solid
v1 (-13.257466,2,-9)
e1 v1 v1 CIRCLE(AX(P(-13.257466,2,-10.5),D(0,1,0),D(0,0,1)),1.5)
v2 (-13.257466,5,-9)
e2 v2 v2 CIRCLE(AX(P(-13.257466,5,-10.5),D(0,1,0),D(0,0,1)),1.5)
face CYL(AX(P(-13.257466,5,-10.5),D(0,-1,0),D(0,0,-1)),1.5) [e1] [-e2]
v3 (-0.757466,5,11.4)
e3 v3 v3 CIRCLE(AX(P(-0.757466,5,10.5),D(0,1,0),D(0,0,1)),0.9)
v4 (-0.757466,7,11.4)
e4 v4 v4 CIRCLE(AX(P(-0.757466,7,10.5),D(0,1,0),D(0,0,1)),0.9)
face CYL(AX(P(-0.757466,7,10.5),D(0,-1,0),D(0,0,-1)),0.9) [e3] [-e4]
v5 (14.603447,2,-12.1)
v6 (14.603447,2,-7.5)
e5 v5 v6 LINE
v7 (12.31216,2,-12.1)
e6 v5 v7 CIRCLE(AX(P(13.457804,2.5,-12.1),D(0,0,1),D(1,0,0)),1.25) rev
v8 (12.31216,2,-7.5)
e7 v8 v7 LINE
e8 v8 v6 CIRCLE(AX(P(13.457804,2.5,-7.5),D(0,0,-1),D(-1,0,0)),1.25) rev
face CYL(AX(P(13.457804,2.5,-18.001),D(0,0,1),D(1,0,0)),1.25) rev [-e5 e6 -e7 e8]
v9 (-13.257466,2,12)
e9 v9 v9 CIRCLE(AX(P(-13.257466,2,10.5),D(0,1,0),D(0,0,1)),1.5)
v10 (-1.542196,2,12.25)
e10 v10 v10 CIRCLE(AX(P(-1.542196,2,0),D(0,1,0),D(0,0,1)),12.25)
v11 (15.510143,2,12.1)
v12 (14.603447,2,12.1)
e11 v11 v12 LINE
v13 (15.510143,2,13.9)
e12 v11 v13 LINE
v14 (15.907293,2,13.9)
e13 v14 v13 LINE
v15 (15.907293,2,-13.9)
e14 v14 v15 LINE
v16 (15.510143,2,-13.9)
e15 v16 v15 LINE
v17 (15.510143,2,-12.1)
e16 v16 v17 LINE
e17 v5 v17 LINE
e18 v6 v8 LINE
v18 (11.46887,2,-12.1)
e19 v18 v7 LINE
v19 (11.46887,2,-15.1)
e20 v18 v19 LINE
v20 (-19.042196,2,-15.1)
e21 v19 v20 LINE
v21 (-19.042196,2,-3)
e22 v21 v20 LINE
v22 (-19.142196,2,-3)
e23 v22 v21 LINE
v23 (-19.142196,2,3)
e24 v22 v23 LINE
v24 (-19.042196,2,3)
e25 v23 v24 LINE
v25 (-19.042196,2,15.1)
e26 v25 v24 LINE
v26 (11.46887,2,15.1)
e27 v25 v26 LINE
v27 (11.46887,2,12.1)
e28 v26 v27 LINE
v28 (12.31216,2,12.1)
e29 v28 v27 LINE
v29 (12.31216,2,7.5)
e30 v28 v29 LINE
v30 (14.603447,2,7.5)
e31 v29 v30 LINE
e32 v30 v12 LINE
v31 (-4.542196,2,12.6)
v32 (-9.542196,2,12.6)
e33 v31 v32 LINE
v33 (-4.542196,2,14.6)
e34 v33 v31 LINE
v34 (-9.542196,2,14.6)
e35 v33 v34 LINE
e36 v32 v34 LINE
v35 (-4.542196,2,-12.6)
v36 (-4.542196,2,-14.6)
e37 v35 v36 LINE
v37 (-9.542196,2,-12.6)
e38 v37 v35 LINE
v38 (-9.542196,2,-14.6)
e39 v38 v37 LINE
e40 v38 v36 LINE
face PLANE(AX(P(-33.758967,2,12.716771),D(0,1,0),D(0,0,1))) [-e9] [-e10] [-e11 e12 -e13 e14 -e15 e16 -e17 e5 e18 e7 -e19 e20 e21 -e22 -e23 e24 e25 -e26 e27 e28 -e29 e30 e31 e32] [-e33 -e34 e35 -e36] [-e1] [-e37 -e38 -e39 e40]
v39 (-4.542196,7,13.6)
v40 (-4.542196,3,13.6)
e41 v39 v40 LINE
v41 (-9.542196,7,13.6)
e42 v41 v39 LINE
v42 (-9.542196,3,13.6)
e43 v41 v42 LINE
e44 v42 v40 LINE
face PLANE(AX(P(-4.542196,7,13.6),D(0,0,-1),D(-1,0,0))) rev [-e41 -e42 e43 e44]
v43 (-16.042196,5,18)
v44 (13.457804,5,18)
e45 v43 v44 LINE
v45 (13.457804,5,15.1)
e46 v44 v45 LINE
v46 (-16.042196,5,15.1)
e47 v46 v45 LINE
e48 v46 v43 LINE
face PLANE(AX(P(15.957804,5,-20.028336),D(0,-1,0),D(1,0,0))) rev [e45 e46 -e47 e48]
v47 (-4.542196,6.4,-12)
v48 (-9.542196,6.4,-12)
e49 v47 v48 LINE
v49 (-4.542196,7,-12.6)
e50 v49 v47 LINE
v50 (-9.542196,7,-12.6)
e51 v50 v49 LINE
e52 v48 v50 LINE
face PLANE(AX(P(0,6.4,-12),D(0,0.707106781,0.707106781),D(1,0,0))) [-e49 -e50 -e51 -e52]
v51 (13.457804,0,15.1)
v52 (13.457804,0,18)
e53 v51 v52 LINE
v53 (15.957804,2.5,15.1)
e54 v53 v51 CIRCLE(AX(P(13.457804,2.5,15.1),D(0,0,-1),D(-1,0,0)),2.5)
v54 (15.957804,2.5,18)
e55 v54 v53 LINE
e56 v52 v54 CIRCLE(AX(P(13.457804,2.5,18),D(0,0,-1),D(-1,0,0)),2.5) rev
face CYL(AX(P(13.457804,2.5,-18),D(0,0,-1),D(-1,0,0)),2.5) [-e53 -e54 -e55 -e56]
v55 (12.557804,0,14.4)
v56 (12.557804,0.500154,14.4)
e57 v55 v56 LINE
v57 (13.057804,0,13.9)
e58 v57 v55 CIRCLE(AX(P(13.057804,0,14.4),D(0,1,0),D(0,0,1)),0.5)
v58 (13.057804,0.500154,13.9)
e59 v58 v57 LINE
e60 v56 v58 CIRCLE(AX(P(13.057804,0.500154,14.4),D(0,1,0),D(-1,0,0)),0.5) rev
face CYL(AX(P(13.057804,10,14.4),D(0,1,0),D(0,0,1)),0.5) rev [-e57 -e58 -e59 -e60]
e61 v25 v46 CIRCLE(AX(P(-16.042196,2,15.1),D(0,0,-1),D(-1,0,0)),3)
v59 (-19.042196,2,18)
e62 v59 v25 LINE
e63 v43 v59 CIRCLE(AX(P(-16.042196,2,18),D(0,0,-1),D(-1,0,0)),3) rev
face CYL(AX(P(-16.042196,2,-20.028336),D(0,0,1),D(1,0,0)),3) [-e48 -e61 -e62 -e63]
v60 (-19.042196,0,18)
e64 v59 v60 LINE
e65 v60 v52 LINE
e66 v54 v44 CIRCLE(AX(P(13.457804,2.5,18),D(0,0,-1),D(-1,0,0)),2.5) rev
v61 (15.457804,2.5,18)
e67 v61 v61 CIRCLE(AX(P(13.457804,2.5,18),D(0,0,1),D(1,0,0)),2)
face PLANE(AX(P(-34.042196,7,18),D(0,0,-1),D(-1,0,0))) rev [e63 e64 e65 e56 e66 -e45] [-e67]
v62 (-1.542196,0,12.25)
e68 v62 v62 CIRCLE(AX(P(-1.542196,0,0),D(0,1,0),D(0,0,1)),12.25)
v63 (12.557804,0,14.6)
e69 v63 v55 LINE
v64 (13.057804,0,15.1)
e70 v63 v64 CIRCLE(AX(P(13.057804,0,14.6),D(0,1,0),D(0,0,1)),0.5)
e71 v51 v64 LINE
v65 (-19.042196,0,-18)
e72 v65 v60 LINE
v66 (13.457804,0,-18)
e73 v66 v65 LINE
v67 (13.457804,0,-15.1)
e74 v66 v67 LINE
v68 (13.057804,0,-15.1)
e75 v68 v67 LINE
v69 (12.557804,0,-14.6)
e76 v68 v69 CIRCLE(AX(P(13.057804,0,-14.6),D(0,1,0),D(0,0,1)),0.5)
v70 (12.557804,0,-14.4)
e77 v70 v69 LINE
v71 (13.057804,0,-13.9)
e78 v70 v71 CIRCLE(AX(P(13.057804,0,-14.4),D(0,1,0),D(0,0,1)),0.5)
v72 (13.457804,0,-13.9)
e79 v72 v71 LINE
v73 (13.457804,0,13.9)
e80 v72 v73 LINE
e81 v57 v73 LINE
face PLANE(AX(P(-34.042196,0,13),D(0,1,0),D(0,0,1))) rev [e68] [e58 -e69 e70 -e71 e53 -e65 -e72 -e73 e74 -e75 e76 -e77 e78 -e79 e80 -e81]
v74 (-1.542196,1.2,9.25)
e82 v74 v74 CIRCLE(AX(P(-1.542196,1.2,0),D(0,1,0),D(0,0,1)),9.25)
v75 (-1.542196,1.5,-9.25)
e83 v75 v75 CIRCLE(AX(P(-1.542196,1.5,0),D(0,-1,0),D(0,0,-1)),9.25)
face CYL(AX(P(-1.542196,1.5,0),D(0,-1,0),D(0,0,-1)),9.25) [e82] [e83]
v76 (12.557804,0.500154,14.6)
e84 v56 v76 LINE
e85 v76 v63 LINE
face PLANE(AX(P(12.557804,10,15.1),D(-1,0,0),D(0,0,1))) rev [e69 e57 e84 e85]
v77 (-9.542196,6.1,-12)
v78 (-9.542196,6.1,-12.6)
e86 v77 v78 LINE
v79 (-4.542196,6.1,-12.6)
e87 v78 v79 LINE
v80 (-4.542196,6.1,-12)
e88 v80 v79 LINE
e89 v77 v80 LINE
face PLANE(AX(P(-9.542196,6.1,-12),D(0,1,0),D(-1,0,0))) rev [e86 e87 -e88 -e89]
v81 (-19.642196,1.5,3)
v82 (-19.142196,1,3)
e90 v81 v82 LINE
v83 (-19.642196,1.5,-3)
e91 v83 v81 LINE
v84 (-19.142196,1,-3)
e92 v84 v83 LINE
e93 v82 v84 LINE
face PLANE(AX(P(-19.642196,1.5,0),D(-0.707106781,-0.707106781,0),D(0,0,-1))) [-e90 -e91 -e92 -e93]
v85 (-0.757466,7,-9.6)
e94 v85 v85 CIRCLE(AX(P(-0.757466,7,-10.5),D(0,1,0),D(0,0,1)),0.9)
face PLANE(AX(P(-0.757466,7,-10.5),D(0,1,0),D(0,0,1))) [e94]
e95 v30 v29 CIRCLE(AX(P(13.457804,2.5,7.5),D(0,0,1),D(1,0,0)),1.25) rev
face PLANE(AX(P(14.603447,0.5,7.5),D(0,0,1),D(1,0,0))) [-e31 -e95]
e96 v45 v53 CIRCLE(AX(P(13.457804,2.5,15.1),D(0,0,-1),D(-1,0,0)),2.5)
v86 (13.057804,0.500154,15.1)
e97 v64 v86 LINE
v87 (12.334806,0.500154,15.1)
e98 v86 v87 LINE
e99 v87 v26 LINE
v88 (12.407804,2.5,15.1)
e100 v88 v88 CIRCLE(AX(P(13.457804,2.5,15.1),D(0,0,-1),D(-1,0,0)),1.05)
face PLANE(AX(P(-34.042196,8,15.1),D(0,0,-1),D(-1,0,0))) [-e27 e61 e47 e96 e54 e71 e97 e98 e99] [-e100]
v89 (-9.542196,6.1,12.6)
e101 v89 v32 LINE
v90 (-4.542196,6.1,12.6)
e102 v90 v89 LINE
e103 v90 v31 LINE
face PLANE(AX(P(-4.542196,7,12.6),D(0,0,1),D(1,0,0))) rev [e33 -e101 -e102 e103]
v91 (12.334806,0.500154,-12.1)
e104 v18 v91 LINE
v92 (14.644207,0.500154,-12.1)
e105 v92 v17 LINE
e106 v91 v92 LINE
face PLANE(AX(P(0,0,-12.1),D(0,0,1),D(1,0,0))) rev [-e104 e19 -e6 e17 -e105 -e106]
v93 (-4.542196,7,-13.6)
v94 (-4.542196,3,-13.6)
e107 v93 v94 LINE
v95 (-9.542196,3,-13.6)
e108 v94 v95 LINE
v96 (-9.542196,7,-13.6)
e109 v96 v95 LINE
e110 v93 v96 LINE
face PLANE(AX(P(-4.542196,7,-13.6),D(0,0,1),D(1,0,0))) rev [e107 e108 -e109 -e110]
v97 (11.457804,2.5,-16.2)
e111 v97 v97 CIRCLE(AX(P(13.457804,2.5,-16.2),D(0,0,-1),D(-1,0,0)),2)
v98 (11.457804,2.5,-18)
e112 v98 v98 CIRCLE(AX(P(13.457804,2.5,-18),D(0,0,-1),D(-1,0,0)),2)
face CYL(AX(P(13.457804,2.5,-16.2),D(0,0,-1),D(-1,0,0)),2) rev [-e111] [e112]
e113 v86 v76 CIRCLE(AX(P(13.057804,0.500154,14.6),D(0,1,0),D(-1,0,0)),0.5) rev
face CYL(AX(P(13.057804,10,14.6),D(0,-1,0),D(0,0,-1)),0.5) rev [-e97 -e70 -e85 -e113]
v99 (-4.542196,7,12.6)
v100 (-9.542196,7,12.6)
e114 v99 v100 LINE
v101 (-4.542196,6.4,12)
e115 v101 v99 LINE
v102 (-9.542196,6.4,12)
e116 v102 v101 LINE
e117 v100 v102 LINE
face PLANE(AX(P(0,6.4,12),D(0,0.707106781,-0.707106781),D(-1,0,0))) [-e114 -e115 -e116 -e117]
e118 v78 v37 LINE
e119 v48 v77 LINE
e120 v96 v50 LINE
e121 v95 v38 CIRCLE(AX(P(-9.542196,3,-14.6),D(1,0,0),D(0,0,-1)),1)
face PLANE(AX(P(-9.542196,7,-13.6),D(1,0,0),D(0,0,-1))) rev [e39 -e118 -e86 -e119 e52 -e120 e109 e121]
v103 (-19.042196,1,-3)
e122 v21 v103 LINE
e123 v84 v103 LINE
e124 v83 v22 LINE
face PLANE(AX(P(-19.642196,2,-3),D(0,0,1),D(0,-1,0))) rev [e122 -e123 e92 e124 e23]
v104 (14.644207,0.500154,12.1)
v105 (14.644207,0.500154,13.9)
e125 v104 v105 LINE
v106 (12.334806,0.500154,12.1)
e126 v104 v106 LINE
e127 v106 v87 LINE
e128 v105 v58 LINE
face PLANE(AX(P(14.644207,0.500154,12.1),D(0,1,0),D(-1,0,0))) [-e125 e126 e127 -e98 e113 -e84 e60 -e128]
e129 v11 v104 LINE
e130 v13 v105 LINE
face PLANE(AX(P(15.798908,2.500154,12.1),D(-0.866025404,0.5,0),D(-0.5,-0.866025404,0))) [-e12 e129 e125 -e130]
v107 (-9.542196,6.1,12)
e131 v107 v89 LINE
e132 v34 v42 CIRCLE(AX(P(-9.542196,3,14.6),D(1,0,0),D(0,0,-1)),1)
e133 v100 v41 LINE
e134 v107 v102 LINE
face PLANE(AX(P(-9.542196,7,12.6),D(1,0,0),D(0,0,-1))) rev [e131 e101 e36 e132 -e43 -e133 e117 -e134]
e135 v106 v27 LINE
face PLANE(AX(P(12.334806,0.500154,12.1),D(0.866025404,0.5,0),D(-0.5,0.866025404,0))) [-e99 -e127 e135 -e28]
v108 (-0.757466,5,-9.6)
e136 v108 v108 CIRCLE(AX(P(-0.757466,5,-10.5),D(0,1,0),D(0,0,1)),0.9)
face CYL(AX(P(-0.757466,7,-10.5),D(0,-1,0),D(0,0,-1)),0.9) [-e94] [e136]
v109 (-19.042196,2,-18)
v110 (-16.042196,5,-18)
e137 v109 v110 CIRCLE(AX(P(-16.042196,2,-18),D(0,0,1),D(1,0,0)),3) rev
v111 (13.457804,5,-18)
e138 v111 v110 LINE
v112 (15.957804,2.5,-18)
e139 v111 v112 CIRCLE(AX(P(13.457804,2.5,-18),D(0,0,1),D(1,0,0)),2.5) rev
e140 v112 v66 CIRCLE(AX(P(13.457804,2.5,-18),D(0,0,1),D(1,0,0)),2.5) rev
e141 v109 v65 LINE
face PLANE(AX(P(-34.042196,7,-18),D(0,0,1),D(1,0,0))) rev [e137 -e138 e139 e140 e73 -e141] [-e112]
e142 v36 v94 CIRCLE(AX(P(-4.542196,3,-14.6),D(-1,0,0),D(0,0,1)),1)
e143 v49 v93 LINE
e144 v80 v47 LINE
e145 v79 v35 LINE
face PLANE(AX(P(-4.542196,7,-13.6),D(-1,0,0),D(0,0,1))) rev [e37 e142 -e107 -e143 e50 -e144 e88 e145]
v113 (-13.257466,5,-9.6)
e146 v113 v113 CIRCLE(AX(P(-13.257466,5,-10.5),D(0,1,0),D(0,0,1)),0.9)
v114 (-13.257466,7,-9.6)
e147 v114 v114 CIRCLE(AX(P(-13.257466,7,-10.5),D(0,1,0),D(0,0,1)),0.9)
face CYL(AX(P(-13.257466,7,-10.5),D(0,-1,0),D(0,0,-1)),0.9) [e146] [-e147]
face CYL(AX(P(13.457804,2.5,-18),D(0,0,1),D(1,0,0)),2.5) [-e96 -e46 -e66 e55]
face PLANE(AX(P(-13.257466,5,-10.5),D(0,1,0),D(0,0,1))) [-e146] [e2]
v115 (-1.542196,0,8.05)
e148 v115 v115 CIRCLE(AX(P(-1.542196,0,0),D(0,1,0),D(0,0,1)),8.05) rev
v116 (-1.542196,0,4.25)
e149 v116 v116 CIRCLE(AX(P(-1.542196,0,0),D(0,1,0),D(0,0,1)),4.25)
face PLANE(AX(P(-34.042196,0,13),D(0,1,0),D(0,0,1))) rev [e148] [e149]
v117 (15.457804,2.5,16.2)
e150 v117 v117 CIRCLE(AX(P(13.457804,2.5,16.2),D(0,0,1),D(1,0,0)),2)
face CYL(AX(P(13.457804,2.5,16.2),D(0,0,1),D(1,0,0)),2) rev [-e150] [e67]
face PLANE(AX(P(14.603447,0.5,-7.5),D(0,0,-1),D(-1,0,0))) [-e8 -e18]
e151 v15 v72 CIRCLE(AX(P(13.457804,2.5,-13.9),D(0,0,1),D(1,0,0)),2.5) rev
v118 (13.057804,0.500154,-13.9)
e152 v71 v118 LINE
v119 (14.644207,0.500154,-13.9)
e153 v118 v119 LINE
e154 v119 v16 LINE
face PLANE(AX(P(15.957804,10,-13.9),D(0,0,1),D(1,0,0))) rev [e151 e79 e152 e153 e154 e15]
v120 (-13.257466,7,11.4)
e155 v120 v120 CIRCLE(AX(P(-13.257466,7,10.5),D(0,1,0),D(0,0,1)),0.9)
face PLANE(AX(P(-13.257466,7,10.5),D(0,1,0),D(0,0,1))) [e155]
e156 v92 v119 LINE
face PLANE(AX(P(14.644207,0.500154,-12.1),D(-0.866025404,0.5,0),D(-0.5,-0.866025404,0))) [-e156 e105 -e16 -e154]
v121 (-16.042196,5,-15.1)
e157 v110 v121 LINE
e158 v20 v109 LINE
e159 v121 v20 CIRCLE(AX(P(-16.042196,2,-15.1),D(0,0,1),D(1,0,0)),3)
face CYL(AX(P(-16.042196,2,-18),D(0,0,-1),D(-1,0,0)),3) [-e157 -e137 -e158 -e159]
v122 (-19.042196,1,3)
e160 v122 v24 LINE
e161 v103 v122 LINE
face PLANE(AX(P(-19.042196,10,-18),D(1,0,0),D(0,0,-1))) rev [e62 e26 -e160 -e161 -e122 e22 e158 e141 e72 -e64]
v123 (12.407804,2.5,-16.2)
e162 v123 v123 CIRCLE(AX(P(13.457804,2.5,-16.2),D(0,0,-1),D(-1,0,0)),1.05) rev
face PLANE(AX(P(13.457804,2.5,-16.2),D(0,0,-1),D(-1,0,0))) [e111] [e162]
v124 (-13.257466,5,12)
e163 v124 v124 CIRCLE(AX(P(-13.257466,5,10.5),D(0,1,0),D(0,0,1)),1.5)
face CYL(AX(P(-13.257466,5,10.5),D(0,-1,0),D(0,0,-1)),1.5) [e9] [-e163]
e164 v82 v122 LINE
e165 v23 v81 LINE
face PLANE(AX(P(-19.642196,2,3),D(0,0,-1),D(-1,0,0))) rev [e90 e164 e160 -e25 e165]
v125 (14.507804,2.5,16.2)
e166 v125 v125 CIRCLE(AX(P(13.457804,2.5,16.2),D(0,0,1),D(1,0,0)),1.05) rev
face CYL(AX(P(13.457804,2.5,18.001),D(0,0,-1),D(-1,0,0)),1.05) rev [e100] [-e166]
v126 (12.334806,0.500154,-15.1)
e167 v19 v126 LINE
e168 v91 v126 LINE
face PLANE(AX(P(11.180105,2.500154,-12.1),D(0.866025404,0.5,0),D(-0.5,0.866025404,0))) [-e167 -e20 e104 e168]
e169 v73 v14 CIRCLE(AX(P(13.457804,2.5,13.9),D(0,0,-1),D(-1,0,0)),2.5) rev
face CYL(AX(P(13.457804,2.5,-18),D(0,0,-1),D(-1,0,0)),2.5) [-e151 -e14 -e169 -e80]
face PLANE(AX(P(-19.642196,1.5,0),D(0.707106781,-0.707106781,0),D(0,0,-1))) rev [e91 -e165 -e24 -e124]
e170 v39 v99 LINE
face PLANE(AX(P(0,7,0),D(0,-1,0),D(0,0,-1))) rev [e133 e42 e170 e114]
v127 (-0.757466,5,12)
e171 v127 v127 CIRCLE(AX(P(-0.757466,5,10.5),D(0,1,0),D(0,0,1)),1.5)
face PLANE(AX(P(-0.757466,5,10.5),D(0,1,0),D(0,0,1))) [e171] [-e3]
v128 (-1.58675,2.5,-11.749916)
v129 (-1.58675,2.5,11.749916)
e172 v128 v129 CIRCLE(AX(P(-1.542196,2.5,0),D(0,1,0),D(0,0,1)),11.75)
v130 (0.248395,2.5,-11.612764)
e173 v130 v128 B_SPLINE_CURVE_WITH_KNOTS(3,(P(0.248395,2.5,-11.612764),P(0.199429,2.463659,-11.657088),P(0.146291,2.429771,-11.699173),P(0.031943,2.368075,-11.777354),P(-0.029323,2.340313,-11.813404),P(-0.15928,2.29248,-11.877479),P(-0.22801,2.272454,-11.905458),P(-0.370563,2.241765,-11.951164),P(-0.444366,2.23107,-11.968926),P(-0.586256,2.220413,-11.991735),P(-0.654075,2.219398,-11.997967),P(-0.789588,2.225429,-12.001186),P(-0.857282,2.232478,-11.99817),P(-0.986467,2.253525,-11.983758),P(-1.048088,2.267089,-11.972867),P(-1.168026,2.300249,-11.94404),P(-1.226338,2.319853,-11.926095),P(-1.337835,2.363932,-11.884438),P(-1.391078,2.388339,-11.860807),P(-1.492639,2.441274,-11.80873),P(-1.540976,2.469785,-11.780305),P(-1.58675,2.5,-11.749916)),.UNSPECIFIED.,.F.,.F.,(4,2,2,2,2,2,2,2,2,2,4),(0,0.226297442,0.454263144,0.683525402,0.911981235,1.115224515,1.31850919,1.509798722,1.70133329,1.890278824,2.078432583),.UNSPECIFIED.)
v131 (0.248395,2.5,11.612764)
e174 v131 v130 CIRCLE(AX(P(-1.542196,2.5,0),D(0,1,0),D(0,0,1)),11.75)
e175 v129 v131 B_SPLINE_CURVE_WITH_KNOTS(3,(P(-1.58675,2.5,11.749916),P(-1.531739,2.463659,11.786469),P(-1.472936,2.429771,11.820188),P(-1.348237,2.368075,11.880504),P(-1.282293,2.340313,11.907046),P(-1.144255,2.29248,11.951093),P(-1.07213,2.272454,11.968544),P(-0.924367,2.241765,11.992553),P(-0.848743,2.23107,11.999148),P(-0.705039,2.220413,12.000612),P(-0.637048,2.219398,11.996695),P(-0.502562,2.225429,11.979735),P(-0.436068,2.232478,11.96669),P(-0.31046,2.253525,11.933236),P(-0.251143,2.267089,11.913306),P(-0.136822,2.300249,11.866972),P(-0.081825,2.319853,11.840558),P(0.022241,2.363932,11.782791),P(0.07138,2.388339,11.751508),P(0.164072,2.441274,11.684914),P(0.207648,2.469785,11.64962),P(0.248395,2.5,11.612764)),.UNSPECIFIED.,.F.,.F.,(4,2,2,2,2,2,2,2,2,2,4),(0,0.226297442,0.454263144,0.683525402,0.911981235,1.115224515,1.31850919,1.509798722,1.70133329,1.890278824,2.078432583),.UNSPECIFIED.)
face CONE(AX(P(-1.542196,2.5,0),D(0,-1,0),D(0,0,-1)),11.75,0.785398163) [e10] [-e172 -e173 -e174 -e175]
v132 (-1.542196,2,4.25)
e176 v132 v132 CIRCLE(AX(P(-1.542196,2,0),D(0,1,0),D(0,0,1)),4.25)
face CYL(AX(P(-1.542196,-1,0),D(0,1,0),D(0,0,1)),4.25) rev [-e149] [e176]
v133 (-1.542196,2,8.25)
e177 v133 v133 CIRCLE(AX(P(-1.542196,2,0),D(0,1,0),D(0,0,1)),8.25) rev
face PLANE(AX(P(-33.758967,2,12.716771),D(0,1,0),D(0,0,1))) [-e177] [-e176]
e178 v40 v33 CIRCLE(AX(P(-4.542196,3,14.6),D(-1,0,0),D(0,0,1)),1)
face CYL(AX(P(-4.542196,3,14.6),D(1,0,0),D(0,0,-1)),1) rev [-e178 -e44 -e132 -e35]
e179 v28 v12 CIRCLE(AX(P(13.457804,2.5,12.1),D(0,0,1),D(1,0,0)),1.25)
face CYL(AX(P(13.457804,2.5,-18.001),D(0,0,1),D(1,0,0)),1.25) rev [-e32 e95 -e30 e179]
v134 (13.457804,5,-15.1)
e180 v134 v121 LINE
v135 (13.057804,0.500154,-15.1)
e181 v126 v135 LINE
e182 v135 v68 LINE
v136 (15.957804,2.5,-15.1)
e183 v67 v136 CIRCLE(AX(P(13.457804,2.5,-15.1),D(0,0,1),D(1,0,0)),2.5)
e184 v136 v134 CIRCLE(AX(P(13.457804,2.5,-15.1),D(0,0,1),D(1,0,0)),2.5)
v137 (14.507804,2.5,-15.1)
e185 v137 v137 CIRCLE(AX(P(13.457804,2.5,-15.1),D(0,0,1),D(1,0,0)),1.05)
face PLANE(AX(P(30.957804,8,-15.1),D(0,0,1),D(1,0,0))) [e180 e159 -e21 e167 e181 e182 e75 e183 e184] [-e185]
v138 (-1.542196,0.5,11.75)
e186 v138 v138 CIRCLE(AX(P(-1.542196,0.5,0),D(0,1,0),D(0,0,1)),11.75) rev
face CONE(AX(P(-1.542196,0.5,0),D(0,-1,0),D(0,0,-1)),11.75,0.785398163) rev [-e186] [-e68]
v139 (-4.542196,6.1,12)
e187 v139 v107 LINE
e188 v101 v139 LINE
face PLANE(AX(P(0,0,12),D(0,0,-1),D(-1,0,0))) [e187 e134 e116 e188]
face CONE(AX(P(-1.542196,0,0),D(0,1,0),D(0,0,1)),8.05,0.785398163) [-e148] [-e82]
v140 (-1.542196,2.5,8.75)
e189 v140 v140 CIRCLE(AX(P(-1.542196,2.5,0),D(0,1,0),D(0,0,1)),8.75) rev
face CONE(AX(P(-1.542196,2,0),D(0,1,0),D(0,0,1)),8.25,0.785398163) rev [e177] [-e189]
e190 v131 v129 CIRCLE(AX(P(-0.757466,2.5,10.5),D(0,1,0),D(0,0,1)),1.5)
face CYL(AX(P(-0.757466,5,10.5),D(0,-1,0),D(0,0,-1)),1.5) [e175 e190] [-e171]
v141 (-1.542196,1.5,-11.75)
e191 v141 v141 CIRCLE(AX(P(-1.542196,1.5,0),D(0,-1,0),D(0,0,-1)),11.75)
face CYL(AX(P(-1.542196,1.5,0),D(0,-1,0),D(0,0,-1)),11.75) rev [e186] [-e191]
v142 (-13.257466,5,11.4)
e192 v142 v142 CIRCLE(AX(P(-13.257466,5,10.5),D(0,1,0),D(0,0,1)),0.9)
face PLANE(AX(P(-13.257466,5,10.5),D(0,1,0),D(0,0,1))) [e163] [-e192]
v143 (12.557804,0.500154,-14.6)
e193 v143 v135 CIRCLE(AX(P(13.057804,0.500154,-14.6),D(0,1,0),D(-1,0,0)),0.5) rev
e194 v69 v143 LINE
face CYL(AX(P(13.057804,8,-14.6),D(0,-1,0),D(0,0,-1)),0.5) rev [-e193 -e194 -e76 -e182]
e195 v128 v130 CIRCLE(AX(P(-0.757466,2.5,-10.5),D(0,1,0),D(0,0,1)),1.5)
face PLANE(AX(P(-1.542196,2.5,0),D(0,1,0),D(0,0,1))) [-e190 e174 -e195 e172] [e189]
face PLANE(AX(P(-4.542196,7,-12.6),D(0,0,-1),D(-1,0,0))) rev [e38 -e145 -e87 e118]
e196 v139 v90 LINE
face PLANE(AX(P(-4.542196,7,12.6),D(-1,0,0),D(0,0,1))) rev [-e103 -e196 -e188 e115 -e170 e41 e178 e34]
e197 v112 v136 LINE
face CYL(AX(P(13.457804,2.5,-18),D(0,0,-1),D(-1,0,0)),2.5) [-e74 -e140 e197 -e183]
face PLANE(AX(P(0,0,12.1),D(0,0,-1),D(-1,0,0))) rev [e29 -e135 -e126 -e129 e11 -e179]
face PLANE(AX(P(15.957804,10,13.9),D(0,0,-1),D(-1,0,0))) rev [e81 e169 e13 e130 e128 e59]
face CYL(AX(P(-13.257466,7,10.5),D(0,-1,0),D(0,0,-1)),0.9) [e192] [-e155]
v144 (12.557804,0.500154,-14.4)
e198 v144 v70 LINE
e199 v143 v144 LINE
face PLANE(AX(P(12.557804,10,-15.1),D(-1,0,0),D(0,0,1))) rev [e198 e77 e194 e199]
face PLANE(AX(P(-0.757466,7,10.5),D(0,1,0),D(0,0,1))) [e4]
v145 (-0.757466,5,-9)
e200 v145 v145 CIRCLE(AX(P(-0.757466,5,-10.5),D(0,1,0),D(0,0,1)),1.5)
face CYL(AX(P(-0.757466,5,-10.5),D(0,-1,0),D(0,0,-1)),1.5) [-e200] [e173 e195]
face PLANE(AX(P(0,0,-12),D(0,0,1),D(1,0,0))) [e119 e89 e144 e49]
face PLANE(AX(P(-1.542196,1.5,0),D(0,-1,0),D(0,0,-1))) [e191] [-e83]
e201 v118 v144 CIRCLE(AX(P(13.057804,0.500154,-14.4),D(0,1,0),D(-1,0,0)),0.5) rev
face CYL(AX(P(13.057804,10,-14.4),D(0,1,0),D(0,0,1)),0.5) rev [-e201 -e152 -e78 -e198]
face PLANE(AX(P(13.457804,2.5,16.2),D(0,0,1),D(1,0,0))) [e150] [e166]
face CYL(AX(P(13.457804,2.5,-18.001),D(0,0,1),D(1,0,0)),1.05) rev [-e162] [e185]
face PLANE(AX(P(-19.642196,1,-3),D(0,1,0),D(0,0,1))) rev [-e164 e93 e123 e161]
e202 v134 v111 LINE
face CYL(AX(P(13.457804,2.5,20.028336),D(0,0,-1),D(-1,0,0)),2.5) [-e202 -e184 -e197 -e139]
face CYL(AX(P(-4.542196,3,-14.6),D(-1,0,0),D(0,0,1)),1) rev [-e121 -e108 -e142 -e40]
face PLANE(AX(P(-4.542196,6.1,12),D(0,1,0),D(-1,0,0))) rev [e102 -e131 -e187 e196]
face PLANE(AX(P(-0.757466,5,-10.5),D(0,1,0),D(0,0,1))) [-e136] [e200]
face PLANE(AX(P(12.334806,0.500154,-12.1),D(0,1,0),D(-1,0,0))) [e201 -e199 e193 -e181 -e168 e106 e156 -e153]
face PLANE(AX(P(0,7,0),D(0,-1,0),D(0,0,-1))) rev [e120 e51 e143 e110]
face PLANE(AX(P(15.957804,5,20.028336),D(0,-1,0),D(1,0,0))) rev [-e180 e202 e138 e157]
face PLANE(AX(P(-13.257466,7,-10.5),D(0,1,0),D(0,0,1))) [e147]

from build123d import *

# Parameters (mm, degrees)
EXTRUDE_2_DEPTH      = 7
EXTRUDE_4_DEPTH      = 1
SKETCH_7_W           = 0.8
SKETCH_7_H           = 10
EXTRUDE_8_DEPTH      = 2.8
SKETCH_8_R           = 0.7
EXTRUDE_9_DEPTH      = 10
FILLET_3_R           = 0.5
SKETCH_13_W          = 0.8
SKETCH_13_H          = 2
CUT_EXTRUDE_2_DEPTH  = 1
CUT_EXTRUDE_START    = -5
CUT_EXTRUDE_3_DEPTH  = 5
SKETCH_19_R          = 4.25
CUT_EXTRUDE_4_DEPTH  = 3
SKETCH_21_R          = 1.5
EXTRUDE_11_DEPTH     = 3
SKETCH_22_R          = 0.9
EXTRUDE_12_DEPTH     = 2
SKETCH_28_W          = 5
SKETCH_28_H          = 1
EXTRUDE_16_DEPTH     = 5
FILLET_4_R           = 1
SKETCH_29_W          = 5
SKETCH_29_H          = 0.9
EXTRUDE_17_DEPTH     = 0.6
SKETCH_30_W          = 5
SKETCH_30_H          = 0.9
EXTRUDE_18_DEPTH     = 0.6
CHAMFER_5_SIZE       = 0.6
CUT_EXTRUDE_5_DEPTH  = 0.5
SKETCH_34_W          = 0.8
SKETCH_34_H          = 12
CUT_EXTRUDE_6_DEPTH  = 1
SKETCH_35_W          = 0.8
SKETCH_35_H          = 10
EXTRUDE_19_DEPTH     = 2.8
SKETCH_36_R          = 0.7
EXTRUDE_20_DEPTH     = 10
FILLET_5_R           = 0.5
FILLET_6_R           = 1
SKETCH_37_R          = 11.75
SKETCH_37_R_2        = 9.25
CUT_EXTRUDE_7_DEPTH  = 1.5
CHAMFER_6_SIZE       = 1.2
CHAMFER_7_SIZE       = 0.5
SKETCH_38_R          = 12.25
SKETCH_38_R_2        = 8.25
EXTRUDE_21_DEPTH     = 0.5
CHAMFER_8_SIZE       = 0.5
SKETCH_39_W          = 27.918227535
SKETCH_39_H          = 36
SKETCH_39_W_2        = 30.545728302
CUT_EXTRUDE_8_DEPTH  = 10
SKETCH_40_W          = 35
SKETCH_40_H          = 3
CUT_EXTRUDE_9_DEPTH  = 2.9
SKETCH_41_W          = 35
SKETCH_41_H          = 3
CUT_EXTRUDE_10_DEPTH = 2.9
FILLET_9_R           = 2.5
CUT_EXTRUDE_12_REACH = 40.823
SKETCH_44_R          = 1.05
FILLET_10_R          = 3
CUT_EXTRUDE_14_REACH = 40.823
SKETCH_47_R          = 1.05
SKETCH_50_R          = 2
CUT_EXTRUDE_17_DEPTH = 1.8
CUT_EXTRUDE_START_2  = -1.8
SKETCH_51_R          = 2
CUT_EXTRUDE_18_DEPTH = 1.8
CUT_EXTRUDE_21_DEPTH = 3
CUT_EXTRUDE_22_DEPTH = 3
CUT_EXTRUDE_23_REACH = 38.299
SKETCH_57_R          = 1.25
SKETCH_58_W          = 3.4
SKETCH_58_H          = 1.2
CUT_EXTRUDE_24_DEPTH = 10
SKETCH_59_W          = 2.291287848
SKETCH_59_H          = 15
EXTRUDE_22_DEPTH     = 1.5
FILLET_11_R          = 0.5
SKETCH_62_W          = 6
SKETCH_62_H          = 1
EXTRUDE_25_DEPTH     = 0.6
CHAMFER_10_SIZE      = 0.5


# Some blends are built 0.0001 mm under size
with BuildPart() as part:
    # case 2 → 凸台-拉伸2 (new body)
    with BuildSketch(Plane(origin=(0, 0, 0), x_dir=(1, 0, 0), z_dir=(0, 1, 0))):
        with BuildLine():
            Line((-34.042196447, 18), (30.957803553, 18))
            ThreePointArc((30.957803553, 18), (34.493337459, 16.535533906), (35.957803553, 13))
            Line((35.957803553, 13), (35.957803553, -13))
            ThreePointArc((35.957803553, -13), (34.493337459, -16.535533906), (30.957803553, -18))
            Line((30.957803553, -18), (-34.042196447, -18))
            ThreePointArc((-34.042196447, -18), (-37.577730353, -16.535533906), (-39.042196447, -13))
            Line((-39.042196447, -13), (-39.042196447, 13))
            ThreePointArc((-39.042196447, 13), (-37.577730353, 16.535533906), (-34.042196447, 18))
        make_face()
    extrude(amount=EXTRUDE_2_DEPTH)

    # 草图3 → 凸台-拉伸4 (add)
    with BuildSketch(Plane(origin=(0, 7, 0), x_dir=(1, 0, 0), z_dir=(0, 1, 0))):
        with BuildLine():
            Line((-36.942196447, 13), (-36.942196447, -13))
            ThreePointArc((-36.942196447, -13), (-35.997398295, -14.955201848), (-34.042196447, -15.9))
            Line((-34.042196447, -15.9), (30.957803553, -15.9))
            ThreePointArc((30.957803553, -15.9), (32.913005401, -14.955201848), (33.857803553, -13))
            Line((33.857803553, -13), (33.857803553, 13))
            ThreePointArc((33.857803553, 13), (32.913005401, 14.955201848), (30.957803553, 15.9))
            Line((30.957803553, 15.9), (-34.042196447, 15.9))
            ThreePointArc((-34.042196447, 15.9), (-35.997398295, 14.955201848), (-36.942196447, 13))
        make_face()
        with BuildLine():
            Line((-34.042196447, -15.1), (30.957803553, -15.1))
            ThreePointArc((30.957803553, -15.1), (32.371630665, -14.413827112), (33.057803553, -13))
            Line((33.057803553, -13), (33.057803553, 13))
            ThreePointArc((33.057803553, 13), (32.371630665, 14.413827112), (30.957803553, 15.1))
            Line((30.957803553, 15.1), (-34.042196447, 15.1))
            ThreePointArc((-34.042196447, 15.1), (-35.456023559, 14.413827112), (-36.142196447, 13))
            Line((-36.142196447, 13), (-36.142196447, -13))
            ThreePointArc((-36.142196447, -13), (-35.456023559, -14.413827112), (-34.042196447, -15.1))
        make_face(mode=Mode.SUBTRACT)
    extrude(amount=EXTRUDE_4_DEPTH)

    # 草图7 → 凸台-拉伸8 (add)
    with BuildSketch(Plane(origin=(0, 7, 0), x_dir=(1, 0, 0), z_dir=(0, 1, 0))):
        with Locations((-36.542196447, 0)):
            Rectangle(SKETCH_7_W, SKETCH_7_H)
    extrude(amount=EXTRUDE_8_DEPTH)

    # 草图8 → 凸台-拉伸9 (add)
    with BuildSketch(Plane.XY.offset(5)):
        with Locations((-36.692196447, 8.6)):
            Circle(SKETCH_8_R)
    extrude(amount=-EXTRUDE_9_DEPTH)

    # 圆角3
    fillet_3_edges = [part.edges().sort_by_distance(p)[0] for p in [
        (-36.942196447, 9.8, 0),
    ]]
    fillet(fillet_3_edges, radius=FILLET_3_R)

    # 草图13 → 切除-拉伸2 (cut)
    with BuildSketch(Plane(origin=(0, 8, 0), x_dir=(1, 0, 0), z_dir=(0, 1, 0))):
        with Locations((-36.542196447, -6)):
            Rectangle(SKETCH_13_W, SKETCH_13_H)
        with Locations((-36.542196447, 6)):
            Rectangle(SKETCH_13_W, SKETCH_13_H)
    extrude(amount=-CUT_EXTRUDE_2_DEPTH, mode=Mode.SUBTRACT)

    # 草图15 → 切除-拉伸3 (cut)
    with BuildSketch(Plane(origin=(0, 7, 0), x_dir=(1, 0, 0), z_dir=(0, 1, 0)).offset(CUT_EXTRUDE_START)):
        with BuildLine():
            Line((-34.042196447, -15.1), (30.957803553, -15.1))
            ThreePointArc((30.957803553, -15.1), (32.371630665, -14.413827112), (33.057803553, -13))
            Line((33.057803553, -13), (33.057803553, 13))
            ThreePointArc((33.057803553, 13), (32.371630665, 14.413827112), (30.957803553, 15.1))
            Line((30.957803553, 15.1), (-34.042196447, 15.1))
            ThreePointArc((-34.042196447, 15.1), (-35.456023559, 14.413827112), (-36.142196447, 13))
            Line((-36.142196447, 13), (-36.142196447, -13))
            ThreePointArc((-36.142196447, -13), (-35.456023559, -14.413827112), (-34.042196447, -15.1))
        make_face()
    extrude(amount=CUT_EXTRUDE_3_DEPTH, mode=Mode.SUBTRACT)

    # 草图19 → 切除-拉伸4 (cut)
    with BuildSketch(Plane(origin=(0, 2, 0), x_dir=(1, 0, 0), z_dir=(0, 1, 0))):
        with Locations(Location((-1.542196447, 0, 0), (0, 0, 270))):
            Circle(SKETCH_19_R)
    extrude(amount=-CUT_EXTRUDE_4_DEPTH, mode=Mode.SUBTRACT)

    # 草图21 → 凸台-拉伸11 (add)
    with BuildSketch(Plane(origin=(0, 2, 0), x_dir=(1, 0, 0), z_dir=(0, 1, 0))):
        with Locations(Location((-13.257466081, 10.5, 0), (0, 0, 270))):
            Circle(SKETCH_21_R)
        with Locations(Location((-0.757466081, 10.5, 0), (0, 0, 270))):
            Circle(SKETCH_21_R)
        with Locations(Location((-13.257466081, -10.5, 0), (0, 0, 270))):
            Circle(SKETCH_21_R)
        with Locations(Location((-0.757466081, -10.5, 0), (0, 0, 270))):
            Circle(SKETCH_21_R)
    extrude(amount=EXTRUDE_11_DEPTH)

    # 草图22 → 凸台-拉伸12 (add)
    with BuildSketch(Plane(origin=(0, 5, 0), x_dir=(1, 0, 0), z_dir=(0, 1, 0))):
        with Locations(Location((-13.257466081, -10.5, 0), (0, 0, 270))):
            Circle(SKETCH_22_R)
        with Locations(Location((-0.757466081, -10.5, 0), (0, 0, 270))):
            Circle(SKETCH_22_R)
        with Locations(Location((-13.257466081, 10.5, 0), (0, 0, 270))):
            Circle(SKETCH_22_R)
        with Locations(Location((-0.757466081, 10.5, 0), (0, 0, 270))):
            Circle(SKETCH_22_R)
    extrude(amount=EXTRUDE_12_DEPTH)

    # 草图28 → 凸台-拉伸16 (add)
    with BuildSketch(Plane(origin=(0, 2, 0), x_dir=(1, 0, 0), z_dir=(0, 1, 0))):
        with Locations((-7.042196447, -13.1)):
            Rectangle(SKETCH_28_W, SKETCH_28_H)
        with Locations((-7.042196447, 13.1)):
            Rectangle(SKETCH_28_W, SKETCH_28_H)
    extrude(amount=EXTRUDE_16_DEPTH)

    # 圆角4
    fillet_4_edges = [part.edges().sort_by_distance(p)[0] for p in [
        (-7.042196447, 2, 13.6),
        (-7.042196447, 2, -13.6),
    ]]
    fillet(fillet_4_edges, radius=FILLET_4_R)

    # 草图29 → 凸台-拉伸17 (add)
    with BuildSketch(Plane(origin=(0, 0, 12.6), x_dir=(-1, 0, 0), z_dir=(0, 0, -1))):
        with Locations((7.042196447, 6.55)):
            Rectangle(SKETCH_29_W, SKETCH_29_H)
    extrude(amount=EXTRUDE_17_DEPTH)

    # 草图30 → 凸台-拉伸18 (add)
    with BuildSketch(Plane.XY.offset(-12.6)):
        with Locations((-7.042196447, 6.55)):
            Rectangle(SKETCH_30_W, SKETCH_30_H)
    extrude(amount=EXTRUDE_18_DEPTH)

    # 倒角5
    chamfer_5_edges = [part.edges().sort_by_distance(p)[0] for p in [
        (-7.042196447, 7, 12),
        (-7.042196447, 7, -12),
    ]]
    chamfer(chamfer_5_edges, length=CHAMFER_5_SIZE)

    # 草图33 → 切除-拉伸5 (cut)
    with BuildSketch(Plane.XZ):
        with BuildLine():
            Line((31.452844049, 12.8823111), (31.128302993, 13.069384422))
            Line((31.128302993, 13.069384422), (29.444684359, 14.04079281))
            Line((29.444684359, 14.04079281), (29.120143303, 14.230122183))
            add(Edge.make_bspline(
                [(29.120143303, 14.230122183), (29.014191488, 14.288710703), (28.897014448, 14.320267891), (28.779809896, 14.320267891)],
                knots=[3, 3, 3, 3, 4, 4, 4, 4], degree=3))
            add(Edge.make_bspline(
                [(28.779809896, 14.320267891), (28.662605343, 14.320267891), (28.545400791, 14.288710703), (28.439476489, 14.230122183)],
                knots=[4, 4, 4, 4, 5, 5, 5, 5], degree=3))
            Line((28.439476489, 14.230122183), (28.11490792, 14.04079281))
            Line((28.11490792, 14.04079281), (26.431289286, 13.069384422))
            Line((26.431289286, 13.069384422), (26.106720717, 12.8823111))
            add(Edge.make_bspline(
                [(26.106720717, 12.8823111), (25.897128163, 12.760608203), (25.76638731, 12.535223299), (25.76638731, 12.2940598)],
                knots=[8, 8, 8, 8, 9, 9, 9, 9], degree=3))
            Line((25.76638731, 12.2940598), (25.76638731, 9.59845139))
            add(Edge.make_bspline(
                [(25.76638731, 9.59845139), (25.76638731, 9.355045597), (25.897128163, 9.131902987), (26.106720717, 9.01020009)],
                knots=[10, 10, 10, 10, 11, 11, 11, 11], degree=3))
            Line((26.106720717, 9.01020009), (26.431289286, 8.823126768))
            Line((26.431289286, 8.823126768), (28.11490792, 7.851718379))
            Line((28.11490792, 7.851718379), (28.439476489, 7.662402763))
            add(Edge.make_bspline(
                [(28.439476489, 7.662402763), (28.545400791, 7.601544437), (28.662605343, 7.572243299), (28.779809896, 7.572243299)],
                knots=[14, 14, 14, 14, 15, 15, 15, 15], degree=3))
            add(Edge.make_bspline(
                [(28.779809896, 7.572243299), (28.897014448, 7.572243299), (29.014191488, 7.601544437), (29.120143303, 7.662402763)],
                knots=[15, 15, 15, 15, 16, 16, 16, 16], degree=3))
            Line((29.120143303, 7.662402763), (29.444684359, 7.851718379))
            Line((29.444684359, 7.851718379), (31.128302993, 8.823126768))
            Line((31.128302993, 8.823126768), (31.452844049, 9.01020009))
            add(Edge.make_bspline(
                [(31.452844049, 9.01020009), (31.664720166, 9.131902987), (31.793177456, 9.355045597), (31.793177456, 9.59845139)],
                knots=[19, 19, 19, 19, 20, 20, 20, 20], degree=3))
            Line((31.793177456, 9.59845139), (31.793177456, 12.2940598))
            add(Edge.make_bspline(
                [(31.793177456, 12.2940598), (31.793177456, 12.535223299), (31.664720166, 12.760608203), (31.452844049, 12.8823111)],
                knots=[21, 21, 21, 21, 22, 22, 22, 22], degree=3))
        make_face()
        with BuildLine():
            Line((26.539469638, 12.614102513), (28.622023955, 13.817663956))
            add(Edge.make_bspline(
                [(28.622023955, 13.817663956), (28.71895157, 13.874010182), (28.840668222, 13.874010182), (28.939824374, 13.817663956)],
                knots=[3, 3, 3, 3, 4, 4, 4, 4], degree=3))
            Line((28.939824374, 13.817663956), (31.011098441, 12.611846463))
            add(Edge.make_bspline(
                [(31.011098441, 12.611846463), (31.117022743, 12.551001893), (31.119278793, 12.397741809), (31.013354491, 12.334627432)],
                knots=[5, 5, 5, 5, 6, 6, 6, 6], degree=3))
            Line((31.013354491, 12.334627432), (29.0006827, 11.131079746))
            add(Edge.make_bspline(
                [(29.0006827, 11.131079746), (28.865429747, 11.052186775), (28.696391069, 11.052186775), (28.561165629, 11.131079746)],
                knots=[7, 7, 7, 7, 8, 8, 8, 8], degree=3))
            add(Edge.make_bspline(
                [(28.561165629, 11.131079746), (26.5237048, 12.307582344), (26.5191927, 12.309838394)],
                knots=[0, 0, 0, 1, 1, 1], degree=2))
            add(Edge.make_bspline(
                [(26.5191927, 12.309838394), (26.413268398, 12.386461558), (26.424521136, 12.548745843), (26.539469638, 12.614102513)],
                knots=[1, 1, 1, 1, 2, 2, 2, 2], degree=3))
        make_face(mode=Mode.SUBTRACT)
        with BuildLine():
            Line((29.625003288, 9.091335354), (29.390594183, 8.960622014))
            Line((29.390594183, 8.960622014), (29.390594183, 9.388845079))
            Line((29.390594183, 9.388845079), (29.597930687, 9.492527088))
            add(Edge.make_bspline(
                [(29.976589432, 10.040210755), (29.976589432, 9.826092344), (29.854900293, 9.636776728), (29.597930687, 9.492527088)],
                knots=[0, 0, 0, 0, 1, 1, 1, 1], degree=3))
            add(Edge.make_bspline(
                [(29.584421899, 10.114591625), (29.836851892, 10.258827509), (29.976589432, 10.261083559), (29.976589432, 10.040210755)],
                knots=[6, 6, 6, 6, 7, 7, 7, 7], degree=3))
            Line((29.584421899, 10.114591625), (29.390594183, 10.006397517))
            add(Edge.make_bspline(
                [(29.368033682, 9.968085935), (29.368033682, 9.983864529), (29.377057883, 9.999643123), (29.390594183, 10.006397517)],
                knots=[4, 4, 4, 4, 5, 5, 5, 5], degree=3))
            Line((29.368033682, 9.968085935), (29.368033682, 9.436180861))
            Line((29.368033682, 9.436180861), (29.368033682, 8.922296676))
            Line((29.368033682, 8.922296676), (29.368033682, 8.246141962))
            add(Edge.make_bspline(
                [(29.368033682, 8.246141962), (29.368033682, 8.230363368), (29.361293045, 8.216840824), (29.345528207, 8.20783038)],
                knots=[3, 3, 3, 3, 4, 4, 4, 4], degree=3))
            Line((29.345528207, 8.20783038), (28.908267186, 7.959912488))
            add(Edge.make_bspline(
                [(28.908267186, 7.959912488), (28.878966048, 7.944133894), (28.842896759, 7.964410832), (28.842896759, 7.99822407)],
                knots=[5, 5, 5, 5, 6, 6, 6, 6], degree=3))
            Line((28.842896759, 7.99822407), (28.842896759, 10.085290487))
            add(Edge.make_bspline(
                [(28.842896759, 10.085290487), (28.842896759, 10.101069081), (28.84966491, 10.116847675), (28.865429747, 10.123602069)],
                knots=[7, 7, 7, 7, 8, 8, 8, 8], degree=3))
            Line((28.865429747, 10.123602069), (29.609210937, 10.54507074))
            add(Edge.make_bspline(
                [(29.609210937, 10.54507074), (30.091537935, 10.817791427), (30.490446105, 10.871881603), (30.490446105, 10.330952329)],
                knots=[9, 9, 9, 9, 10, 10, 10, 10], degree=3))
            add(Edge.make_bspline(
                [(30.490446105, 10.330952329), (30.490446105, 9.81031375), (30.087025835, 9.352789547), (29.625003288, 9.091335354)],
                knots=[10, 10, 10, 10, 11, 11, 11, 11], degree=3))
        make_face(mode=Mode.SUBTRACT)
        with BuildLine():
            Line((31.168856869, 9.231072895), (30.73613546, 8.985411052))
            add(Edge.make_bspline(
                [(30.73613546, 8.985411052), (30.706834322, 8.969632458), (30.670765034, 8.989923153), (30.670765034, 9.023722634)],
                knots=[2, 2, 2, 2, 3, 3, 3, 3], degree=3))
            Line((30.670765034, 9.023722634), (30.670765034, 10.017677767))
            add(Edge.make_bspline(
                [(30.670765034, 10.017677767), (30.670765034, 10.033442605), (30.679789234, 10.046978905), (30.693325534, 10.055989349)],
                knots=[4, 4, 4, 4, 5, 5, 5, 5], degree=3))
            Line((30.693325534, 10.055989349), (31.126046943, 10.299408898))
            add(Edge.make_bspline(
                [(31.126046943, 10.299408898), (31.155348081, 10.315173735), (31.191417369, 10.294896798), (31.191417369, 10.261083559)],
                knots=[6, 6, 6, 6, 7, 7, 7, 7], degree=3))
            Line((31.191417369, 10.261083559), (31.191417369, 9.269398233))
            add(Edge.make_bspline(
                [(31.191417369, 9.269398233), (31.191417369, 9.253619639), (31.182393169, 9.237841045), (31.168856869, 9.231072895)],
                knots=[0, 0, 0, 0, 1, 1, 1, 1], degree=3))
        make_face(mode=Mode.SUBTRACT)
        with BuildLine():
            add(Edge.make_bspline(
                [(30.932219227, 10.959785017), (31.105770005, 11.058954925), (31.229715195, 11.016131243), (31.229715195, 10.858359059), (31.229715195, 10.702842924), (31.105770005, 10.520281702), (30.932219227, 10.423367844)],
                knots=[2, 2, 2, 2, 3, 3, 3, 4, 4, 4, 4], degree=3))
            add(Edge.make_bspline(
                [(30.932219227, 10.423367844), (30.756439911, 10.321941886), (30.632467208, 10.364765568), (30.632467208, 10.520281702), (30.632467208, 10.680309937), (30.756439911, 10.860615109), (30.932219227, 10.959785017)],
                knots=[0, 0, 0, 0, 1, 1, 1, 2, 2, 2, 2], degree=3))
        make_face(mode=Mode.SUBTRACT)
    extrude(amount=-CUT_EXTRUDE_5_DEPTH, mode=Mode.SUBTRACT)

    # 草图34 → 切除-拉伸6 (cut)
    with BuildSketch(Plane(origin=(0, 8, 0), x_dir=(1, 0, 0), z_dir=(0, 1, 0))):
        with Locations((33.457803553, 0)):
            Rectangle(SKETCH_34_W, SKETCH_34_H)
    extrude(amount=-CUT_EXTRUDE_6_DEPTH, mode=Mode.SUBTRACT)

    # 草图35 → 凸台-拉伸19 (add)
    with BuildSketch(Plane(origin=(0, 7, 0), x_dir=(1, 0, 0), z_dir=(0, 1, 0))):
        with Locations((33.457803553, 0)):
            Rectangle(SKETCH_35_W, SKETCH_35_H)
    extrude(amount=EXTRUDE_19_DEPTH)

    # 草图36 → 凸台-拉伸20 (add)
    with BuildSketch(Plane(origin=(0, 0, -5), x_dir=(-1, 0, 0), z_dir=(0, 0, -1))):
        with Locations((-33.609627041, 8.6)):
            Circle(SKETCH_36_R)
    extrude(amount=-EXTRUDE_20_DEPTH)

    # 圆角5
    fillet_5_edges = [part.edges().sort_by_distance(p)[0] for p in [
        (33.857803553, 9.8, 0),
    ]]
    fillet(fillet_5_edges, radius=FILLET_5_R)

    # 圆角6
    fillet_6_edges = [part.edges().sort_by_distance(p)[0] for p in [
        (33.457803553, 8, -6),
        (33.457803553, 8, 6),
        (-36.542196447, 8, 7),
        (-36.542196447, 8, -7),
    ]]
    fillet(fillet_6_edges, radius=FILLET_6_R - 0.0001)  # a hair under: the kernel refuses the full size

    # 草图37 → 切除-拉伸7 (cut)
    with BuildSketch(Plane.XZ):
        with Locations(Location((-1.542196447, 0, 0), (0, 0, 270))):
            Circle(SKETCH_37_R)
        with Locations(Location((-1.542196447, 0, 0), (0, 0, 270))):
            Circle(SKETCH_37_R_2, mode=Mode.SUBTRACT)
    extrude(amount=-CUT_EXTRUDE_7_DEPTH, mode=Mode.SUBTRACT)

    # 倒角6
    chamfer_6_edges = [part.edges().sort_by_distance(p)[0] for p in [
        (-1.542196447, 0, 9.25),
    ]]
    chamfer(chamfer_6_edges, length=CHAMFER_6_SIZE)

    # 倒角7
    chamfer_7_edges = [part.edges().sort_by_distance(p)[0] for p in [
        (-1.542196447, 0, 11.75),
    ]]
    chamfer(chamfer_7_edges, length=CHAMFER_7_SIZE)

    # 草图38 → 凸台-拉伸21 (add)
    with BuildSketch(Plane(origin=(0, 2, 0), x_dir=(1, 0, 0), z_dir=(0, 1, 0))):
        with Locations(Location((-1.542196447, 0, 0), (0, 0, 270))):
            Circle(SKETCH_38_R)
        with Locations(Location((-1.542196447, 0, 0), (0, 0, 270))):
            Circle(SKETCH_38_R_2, mode=Mode.SUBTRACT)
    extrude(amount=EXTRUDE_21_DEPTH)

    # 倒角8
    # the kernel refuses this chamfer: 0.5 mm, written as the material it takes off along each edge
    with BuildSketch(Plane(origin=(-1.542196447, 2.5, 0), x_dir=(0, 0, 1), z_dir=(-1, 0, 0))) as chamfer_8_piece_1_section:
        Polygon((12.25, -CHAMFER_8_SIZE), (12.25 - CHAMFER_8_SIZE, 0), (12.25, 0), align=None)
    chamfer_8_piece_1 = revolve(axis=Axis((-1.542196447, 2.5, 0), (0, 1, 0)), mode=Mode.PRIVATE)
    chamfer_8_piece_1 = split(chamfer_8_piece_1, bisect_by=Plane(origin=(-1.542196447, 2, -12.008331629), z_dir=(0, 1, 0)), keep=Keep.TOP, mode=Mode.PRIVATE)
    chamfer_8_piece_1 = chamfer_8_piece_1 - Plane(origin=(-0.757466081, 2.272473764, 10.5), x_dir=(0, 0, 1), z_dir=(0, -1, 0)) * Cylinder(1.5, 49, mode=Mode.PRIVATE)
    chamfer_8_piece_1 = chamfer_8_piece_1 - Plane(origin=(-0.757466081, 2.272473764, -10.5), x_dir=(0, 0, 1), z_dir=(0, -1, 0)) * Cylinder(1.5, 49, mode=Mode.PRIVATE)
    add(chamfer_8_piece_1, mode=Mode.SUBTRACT)
    with BuildSketch(Plane(origin=(-1.542196447, 2.5, 0), x_dir=(0, 0, 1), z_dir=(-1, 0, 0))) as chamfer_8_piece_2_section:
        Polygon((8.25, -CHAMFER_8_SIZE), (8.25 + CHAMFER_8_SIZE, 0), (8.25, 0), align=None)
    chamfer_8_piece_2 = revolve(axis=Axis((-1.542196447, 2.5, 0), (0, 1, 0)), mode=Mode.PRIVATE)
    chamfer_8_piece_2 = split(chamfer_8_piece_2, bisect_by=Plane(origin=(-1.542196447, 2, -8.493378633), z_dir=(0, 1, 0)), keep=Keep.TOP, mode=Mode.PRIVATE)
    add(chamfer_8_piece_2, mode=Mode.SUBTRACT)

    # 草图39 → 切除-拉伸8 (cut)
    with BuildSketch(Plane.XZ):
        with Locations((29.916917321, 0)):
            Rectangle(SKETCH_39_W, SKETCH_39_H)
        with Locations((-34.315060598, 0)):
            Rectangle(SKETCH_39_W_2, SKETCH_39_H)
    extrude(amount=-CUT_EXTRUDE_8_DEPTH, mode=Mode.SUBTRACT)

    # 草图40 → 切除-拉伸9 (cut)
    with BuildSketch(Plane.XY.offset(18)):
        with Locations((-1.542196447, 6.5)):
            Rectangle(SKETCH_40_W, SKETCH_40_H)
    extrude(amount=-CUT_EXTRUDE_9_DEPTH, mode=Mode.SUBTRACT)

    # 草图41 → 切除-拉伸10 (cut)
    with BuildSketch(Plane(origin=(0, 0, -18), x_dir=(-1, 0, 0), z_dir=(0, 0, -1))):
        with Locations((1.542196447, 6.5)):
            Rectangle(SKETCH_41_W, SKETCH_41_H)
    extrude(amount=-CUT_EXTRUDE_10_DEPTH, mode=Mode.SUBTRACT)

    # 圆角9
    # the kernel refuses this fillet: 2.5 mm, written as the material it takes off along each edge
    with BuildSketch(Plane(origin=(15.957803553, 5, 24.25), x_dir=(0, -1, 0), z_dir=(0, 0, -1))) as fillet_9_piece_1:
        with BuildLine():
            CenterArc((FILLET_9_R, FILLET_9_R), FILLET_9_R, 180, 90)
            Line((0, FILLET_9_R), (0, 0))
            Line((0, 0), (FILLET_9_R, 0))
        make_face()
    extrude(amount=15.4, mode=Mode.SUBTRACT)
    with BuildSketch(Plane(origin=(15.957803553, 5, -24.25), x_dir=(0, -1, 0), z_dir=(0, 0, 1))) as fillet_9_piece_2:
        with BuildLine():
            CenterArc((FILLET_9_R, -FILLET_9_R), FILLET_9_R, 90, 90)
            Line((0, -FILLET_9_R), (0, 0))
            Line((0, 0), (FILLET_9_R, 0))
        make_face()
    extrude(amount=15.4, mode=Mode.SUBTRACT)
    with BuildSketch(Plane(origin=(15.957803553, 0, 24.25), x_dir=(-1, 0, 0), z_dir=(0, 0, -1))) as fillet_9_piece_3:
        with BuildLine():
            CenterArc((FILLET_9_R, FILLET_9_R), FILLET_9_R, 180, 90)
            Line((0, FILLET_9_R), (0, 0))
            Line((0, 0), (FILLET_9_R, 0))
        make_face()
    extrude(amount=48.5, mode=Mode.SUBTRACT)

    # 草图44 → 切除-拉伸12 (cut, up to next)
    with BuildSketch(Plane(origin=(0, 0, 15.1), x_dir=(-1, 0, 0), z_dir=(0, 0, -1)), mode=Mode.PRIVATE) as cut_extrude_12_sk1:
        with Locations((-13.457803553, 2.5)):
            Circle(SKETCH_44_R)
    cut_extrude_12_tool1 = extrude(cut_extrude_12_sk1.sketch, amount=-CUT_EXTRUDE_12_REACH, mode=Mode.PRIVATE) & part.part
    add(cut_extrude_12_tool1.solids().sort_by_distance((13.457804, 2.5, 15.1))[0], mode=Mode.SUBTRACT)

    # 圆角10
    fillet_10_edges = [part.edges().sort_by_distance(p)[0] for p in [
        (-19.042196447, 5, -16.55),
        (-19.042196447, 5, 16.55),
    ]]
    fillet(fillet_10_edges, radius=FILLET_10_R)

    # 草图47 → 切除-拉伸14 (cut, up to next)
    with BuildSketch(Plane.XY.offset(-15.1), mode=Mode.PRIVATE) as cut_extrude_14_sk1:
        with Locations(Location((13.457803553, 2.5, 0), (0, 0, 180))):
            Circle(SKETCH_47_R)
    cut_extrude_14_tool1 = extrude(cut_extrude_14_sk1.sketch, amount=-CUT_EXTRUDE_14_REACH, mode=Mode.PRIVATE) & part.part
    add(cut_extrude_14_tool1.solids().sort_by_distance((13.457804, 2.5, -15.1))[0], mode=Mode.SUBTRACT)

    # 草图50 → 切除-拉伸17 (cut)
    with BuildSketch(Plane(origin=(0, 0, -18), x_dir=(-1, 0, 0), z_dir=(0, 0, -1))):
        with Locations((-13.457803553, 2.5)):
            Circle(SKETCH_50_R)
    extrude(amount=-CUT_EXTRUDE_17_DEPTH, mode=Mode.SUBTRACT)

    # 草图51 → 切除-拉伸18 (cut)
    with BuildSketch(Plane.XY.offset(18).offset(CUT_EXTRUDE_START_2)):
        with Locations(Location((13.457803553, 2.5, 0), (0, 0, 180))):
            Circle(SKETCH_51_R)
    extrude(amount=CUT_EXTRUDE_18_DEPTH, mode=Mode.SUBTRACT)

    # 草图55 → 切除-拉伸21 (cut)
    with BuildSketch(Plane.XY.offset(-15.1)):
        Polygon((14.644207093, 0.500154246), (15.798907632, 2.500154246), (14.644207093, 4.500154246), (12.334806017, 4.500154246), (11.180105478, 2.500154246), (12.334806017, 0.500154246), align=None)
    extrude(amount=CUT_EXTRUDE_21_DEPTH, mode=Mode.SUBTRACT)

    # 草图56 → 切除-拉伸22 (cut)
    with BuildSketch(Plane(origin=(0, 0, 15.1), x_dir=(-1, 0, 0), z_dir=(0, 0, -1))):
        Polygon((-15.798907632, 2.500154246), (-14.644207093, 0.500154246), (-12.334806017, 0.500154246), (-11.180105478, 2.500154246), (-12.334806017, 4.500154246), (-14.644207093, 4.500154246), align=None)
    extrude(amount=CUT_EXTRUDE_22_DEPTH, mode=Mode.SUBTRACT)

    # 草图57 → 切除-拉伸23 (cut, up to next)
    with BuildSketch(Plane.XY.offset(12.1), mode=Mode.PRIVATE) as cut_extrude_23_sk1:
        with Locations((13.457803553, 2.5)):
            Circle(SKETCH_57_R)
    cut_extrude_23_tool1 = extrude(cut_extrude_23_sk1.sketch, amount=-CUT_EXTRUDE_23_REACH, mode=Mode.PRIVATE) & part.part
    add(cut_extrude_23_tool1.solids().sort_by_distance((13.457804, 2.5, 12.1))[0], mode=Mode.SUBTRACT)

    # 草图58 → 切除-拉伸24 (cut)
    with BuildSketch(Plane.XZ):
        with Locations((14.257803553, -14.5)):
            Rectangle(SKETCH_58_W, SKETCH_58_H)
        with Locations((14.257803553, 14.5)):
            Rectangle(SKETCH_58_W, SKETCH_58_H)
    extrude(amount=-CUT_EXTRUDE_24_DEPTH, mode=Mode.SUBTRACT)

    # 草图59 → 凸台-拉伸22 (add)
    with BuildSketch(Plane(origin=(0, 2, 0), x_dir=(1, 0, 0), z_dir=(0, 1, 0))):
        with Locations((13.457803553, 0)):
            Rectangle(SKETCH_59_W, SKETCH_59_H)
    extrude(amount=-EXTRUDE_22_DEPTH)

    # 圆角11
    fillet_11_edges = [part.edges().sort_by_distance(p)[0] for p in [
        (12.557803553, 0.250077123, -15.1),
        (12.557803553, 0.250077123, -13.9),
        (12.557803553, 0.250077123, 13.9),
        (12.557803553, 0.250077123, 15.1),
    ]]
    fillet(fillet_11_edges, radius=FILLET_11_R)

    # 草图62 → 凸台-拉伸25 (add)
    with BuildSketch(Plane.ZY.offset(19.042196447)):
        with Locations((0, 1.5)):
            Rectangle(SKETCH_62_W, SKETCH_62_H)
    extrude(amount=EXTRUDE_25_DEPTH)

    # 倒角10
    chamfer_10_edges = [part.edges().sort_by_distance(p)[0] for p in [
        (-19.642196447, 2, 0),
        (-19.642196447, 1, 0),
    ]]
    chamfer(chamfer_10_edges, length=CHAMFER_10_SIZE - 0.0001)  # a hair under: the kernel refuses the full size


solid = part.part
